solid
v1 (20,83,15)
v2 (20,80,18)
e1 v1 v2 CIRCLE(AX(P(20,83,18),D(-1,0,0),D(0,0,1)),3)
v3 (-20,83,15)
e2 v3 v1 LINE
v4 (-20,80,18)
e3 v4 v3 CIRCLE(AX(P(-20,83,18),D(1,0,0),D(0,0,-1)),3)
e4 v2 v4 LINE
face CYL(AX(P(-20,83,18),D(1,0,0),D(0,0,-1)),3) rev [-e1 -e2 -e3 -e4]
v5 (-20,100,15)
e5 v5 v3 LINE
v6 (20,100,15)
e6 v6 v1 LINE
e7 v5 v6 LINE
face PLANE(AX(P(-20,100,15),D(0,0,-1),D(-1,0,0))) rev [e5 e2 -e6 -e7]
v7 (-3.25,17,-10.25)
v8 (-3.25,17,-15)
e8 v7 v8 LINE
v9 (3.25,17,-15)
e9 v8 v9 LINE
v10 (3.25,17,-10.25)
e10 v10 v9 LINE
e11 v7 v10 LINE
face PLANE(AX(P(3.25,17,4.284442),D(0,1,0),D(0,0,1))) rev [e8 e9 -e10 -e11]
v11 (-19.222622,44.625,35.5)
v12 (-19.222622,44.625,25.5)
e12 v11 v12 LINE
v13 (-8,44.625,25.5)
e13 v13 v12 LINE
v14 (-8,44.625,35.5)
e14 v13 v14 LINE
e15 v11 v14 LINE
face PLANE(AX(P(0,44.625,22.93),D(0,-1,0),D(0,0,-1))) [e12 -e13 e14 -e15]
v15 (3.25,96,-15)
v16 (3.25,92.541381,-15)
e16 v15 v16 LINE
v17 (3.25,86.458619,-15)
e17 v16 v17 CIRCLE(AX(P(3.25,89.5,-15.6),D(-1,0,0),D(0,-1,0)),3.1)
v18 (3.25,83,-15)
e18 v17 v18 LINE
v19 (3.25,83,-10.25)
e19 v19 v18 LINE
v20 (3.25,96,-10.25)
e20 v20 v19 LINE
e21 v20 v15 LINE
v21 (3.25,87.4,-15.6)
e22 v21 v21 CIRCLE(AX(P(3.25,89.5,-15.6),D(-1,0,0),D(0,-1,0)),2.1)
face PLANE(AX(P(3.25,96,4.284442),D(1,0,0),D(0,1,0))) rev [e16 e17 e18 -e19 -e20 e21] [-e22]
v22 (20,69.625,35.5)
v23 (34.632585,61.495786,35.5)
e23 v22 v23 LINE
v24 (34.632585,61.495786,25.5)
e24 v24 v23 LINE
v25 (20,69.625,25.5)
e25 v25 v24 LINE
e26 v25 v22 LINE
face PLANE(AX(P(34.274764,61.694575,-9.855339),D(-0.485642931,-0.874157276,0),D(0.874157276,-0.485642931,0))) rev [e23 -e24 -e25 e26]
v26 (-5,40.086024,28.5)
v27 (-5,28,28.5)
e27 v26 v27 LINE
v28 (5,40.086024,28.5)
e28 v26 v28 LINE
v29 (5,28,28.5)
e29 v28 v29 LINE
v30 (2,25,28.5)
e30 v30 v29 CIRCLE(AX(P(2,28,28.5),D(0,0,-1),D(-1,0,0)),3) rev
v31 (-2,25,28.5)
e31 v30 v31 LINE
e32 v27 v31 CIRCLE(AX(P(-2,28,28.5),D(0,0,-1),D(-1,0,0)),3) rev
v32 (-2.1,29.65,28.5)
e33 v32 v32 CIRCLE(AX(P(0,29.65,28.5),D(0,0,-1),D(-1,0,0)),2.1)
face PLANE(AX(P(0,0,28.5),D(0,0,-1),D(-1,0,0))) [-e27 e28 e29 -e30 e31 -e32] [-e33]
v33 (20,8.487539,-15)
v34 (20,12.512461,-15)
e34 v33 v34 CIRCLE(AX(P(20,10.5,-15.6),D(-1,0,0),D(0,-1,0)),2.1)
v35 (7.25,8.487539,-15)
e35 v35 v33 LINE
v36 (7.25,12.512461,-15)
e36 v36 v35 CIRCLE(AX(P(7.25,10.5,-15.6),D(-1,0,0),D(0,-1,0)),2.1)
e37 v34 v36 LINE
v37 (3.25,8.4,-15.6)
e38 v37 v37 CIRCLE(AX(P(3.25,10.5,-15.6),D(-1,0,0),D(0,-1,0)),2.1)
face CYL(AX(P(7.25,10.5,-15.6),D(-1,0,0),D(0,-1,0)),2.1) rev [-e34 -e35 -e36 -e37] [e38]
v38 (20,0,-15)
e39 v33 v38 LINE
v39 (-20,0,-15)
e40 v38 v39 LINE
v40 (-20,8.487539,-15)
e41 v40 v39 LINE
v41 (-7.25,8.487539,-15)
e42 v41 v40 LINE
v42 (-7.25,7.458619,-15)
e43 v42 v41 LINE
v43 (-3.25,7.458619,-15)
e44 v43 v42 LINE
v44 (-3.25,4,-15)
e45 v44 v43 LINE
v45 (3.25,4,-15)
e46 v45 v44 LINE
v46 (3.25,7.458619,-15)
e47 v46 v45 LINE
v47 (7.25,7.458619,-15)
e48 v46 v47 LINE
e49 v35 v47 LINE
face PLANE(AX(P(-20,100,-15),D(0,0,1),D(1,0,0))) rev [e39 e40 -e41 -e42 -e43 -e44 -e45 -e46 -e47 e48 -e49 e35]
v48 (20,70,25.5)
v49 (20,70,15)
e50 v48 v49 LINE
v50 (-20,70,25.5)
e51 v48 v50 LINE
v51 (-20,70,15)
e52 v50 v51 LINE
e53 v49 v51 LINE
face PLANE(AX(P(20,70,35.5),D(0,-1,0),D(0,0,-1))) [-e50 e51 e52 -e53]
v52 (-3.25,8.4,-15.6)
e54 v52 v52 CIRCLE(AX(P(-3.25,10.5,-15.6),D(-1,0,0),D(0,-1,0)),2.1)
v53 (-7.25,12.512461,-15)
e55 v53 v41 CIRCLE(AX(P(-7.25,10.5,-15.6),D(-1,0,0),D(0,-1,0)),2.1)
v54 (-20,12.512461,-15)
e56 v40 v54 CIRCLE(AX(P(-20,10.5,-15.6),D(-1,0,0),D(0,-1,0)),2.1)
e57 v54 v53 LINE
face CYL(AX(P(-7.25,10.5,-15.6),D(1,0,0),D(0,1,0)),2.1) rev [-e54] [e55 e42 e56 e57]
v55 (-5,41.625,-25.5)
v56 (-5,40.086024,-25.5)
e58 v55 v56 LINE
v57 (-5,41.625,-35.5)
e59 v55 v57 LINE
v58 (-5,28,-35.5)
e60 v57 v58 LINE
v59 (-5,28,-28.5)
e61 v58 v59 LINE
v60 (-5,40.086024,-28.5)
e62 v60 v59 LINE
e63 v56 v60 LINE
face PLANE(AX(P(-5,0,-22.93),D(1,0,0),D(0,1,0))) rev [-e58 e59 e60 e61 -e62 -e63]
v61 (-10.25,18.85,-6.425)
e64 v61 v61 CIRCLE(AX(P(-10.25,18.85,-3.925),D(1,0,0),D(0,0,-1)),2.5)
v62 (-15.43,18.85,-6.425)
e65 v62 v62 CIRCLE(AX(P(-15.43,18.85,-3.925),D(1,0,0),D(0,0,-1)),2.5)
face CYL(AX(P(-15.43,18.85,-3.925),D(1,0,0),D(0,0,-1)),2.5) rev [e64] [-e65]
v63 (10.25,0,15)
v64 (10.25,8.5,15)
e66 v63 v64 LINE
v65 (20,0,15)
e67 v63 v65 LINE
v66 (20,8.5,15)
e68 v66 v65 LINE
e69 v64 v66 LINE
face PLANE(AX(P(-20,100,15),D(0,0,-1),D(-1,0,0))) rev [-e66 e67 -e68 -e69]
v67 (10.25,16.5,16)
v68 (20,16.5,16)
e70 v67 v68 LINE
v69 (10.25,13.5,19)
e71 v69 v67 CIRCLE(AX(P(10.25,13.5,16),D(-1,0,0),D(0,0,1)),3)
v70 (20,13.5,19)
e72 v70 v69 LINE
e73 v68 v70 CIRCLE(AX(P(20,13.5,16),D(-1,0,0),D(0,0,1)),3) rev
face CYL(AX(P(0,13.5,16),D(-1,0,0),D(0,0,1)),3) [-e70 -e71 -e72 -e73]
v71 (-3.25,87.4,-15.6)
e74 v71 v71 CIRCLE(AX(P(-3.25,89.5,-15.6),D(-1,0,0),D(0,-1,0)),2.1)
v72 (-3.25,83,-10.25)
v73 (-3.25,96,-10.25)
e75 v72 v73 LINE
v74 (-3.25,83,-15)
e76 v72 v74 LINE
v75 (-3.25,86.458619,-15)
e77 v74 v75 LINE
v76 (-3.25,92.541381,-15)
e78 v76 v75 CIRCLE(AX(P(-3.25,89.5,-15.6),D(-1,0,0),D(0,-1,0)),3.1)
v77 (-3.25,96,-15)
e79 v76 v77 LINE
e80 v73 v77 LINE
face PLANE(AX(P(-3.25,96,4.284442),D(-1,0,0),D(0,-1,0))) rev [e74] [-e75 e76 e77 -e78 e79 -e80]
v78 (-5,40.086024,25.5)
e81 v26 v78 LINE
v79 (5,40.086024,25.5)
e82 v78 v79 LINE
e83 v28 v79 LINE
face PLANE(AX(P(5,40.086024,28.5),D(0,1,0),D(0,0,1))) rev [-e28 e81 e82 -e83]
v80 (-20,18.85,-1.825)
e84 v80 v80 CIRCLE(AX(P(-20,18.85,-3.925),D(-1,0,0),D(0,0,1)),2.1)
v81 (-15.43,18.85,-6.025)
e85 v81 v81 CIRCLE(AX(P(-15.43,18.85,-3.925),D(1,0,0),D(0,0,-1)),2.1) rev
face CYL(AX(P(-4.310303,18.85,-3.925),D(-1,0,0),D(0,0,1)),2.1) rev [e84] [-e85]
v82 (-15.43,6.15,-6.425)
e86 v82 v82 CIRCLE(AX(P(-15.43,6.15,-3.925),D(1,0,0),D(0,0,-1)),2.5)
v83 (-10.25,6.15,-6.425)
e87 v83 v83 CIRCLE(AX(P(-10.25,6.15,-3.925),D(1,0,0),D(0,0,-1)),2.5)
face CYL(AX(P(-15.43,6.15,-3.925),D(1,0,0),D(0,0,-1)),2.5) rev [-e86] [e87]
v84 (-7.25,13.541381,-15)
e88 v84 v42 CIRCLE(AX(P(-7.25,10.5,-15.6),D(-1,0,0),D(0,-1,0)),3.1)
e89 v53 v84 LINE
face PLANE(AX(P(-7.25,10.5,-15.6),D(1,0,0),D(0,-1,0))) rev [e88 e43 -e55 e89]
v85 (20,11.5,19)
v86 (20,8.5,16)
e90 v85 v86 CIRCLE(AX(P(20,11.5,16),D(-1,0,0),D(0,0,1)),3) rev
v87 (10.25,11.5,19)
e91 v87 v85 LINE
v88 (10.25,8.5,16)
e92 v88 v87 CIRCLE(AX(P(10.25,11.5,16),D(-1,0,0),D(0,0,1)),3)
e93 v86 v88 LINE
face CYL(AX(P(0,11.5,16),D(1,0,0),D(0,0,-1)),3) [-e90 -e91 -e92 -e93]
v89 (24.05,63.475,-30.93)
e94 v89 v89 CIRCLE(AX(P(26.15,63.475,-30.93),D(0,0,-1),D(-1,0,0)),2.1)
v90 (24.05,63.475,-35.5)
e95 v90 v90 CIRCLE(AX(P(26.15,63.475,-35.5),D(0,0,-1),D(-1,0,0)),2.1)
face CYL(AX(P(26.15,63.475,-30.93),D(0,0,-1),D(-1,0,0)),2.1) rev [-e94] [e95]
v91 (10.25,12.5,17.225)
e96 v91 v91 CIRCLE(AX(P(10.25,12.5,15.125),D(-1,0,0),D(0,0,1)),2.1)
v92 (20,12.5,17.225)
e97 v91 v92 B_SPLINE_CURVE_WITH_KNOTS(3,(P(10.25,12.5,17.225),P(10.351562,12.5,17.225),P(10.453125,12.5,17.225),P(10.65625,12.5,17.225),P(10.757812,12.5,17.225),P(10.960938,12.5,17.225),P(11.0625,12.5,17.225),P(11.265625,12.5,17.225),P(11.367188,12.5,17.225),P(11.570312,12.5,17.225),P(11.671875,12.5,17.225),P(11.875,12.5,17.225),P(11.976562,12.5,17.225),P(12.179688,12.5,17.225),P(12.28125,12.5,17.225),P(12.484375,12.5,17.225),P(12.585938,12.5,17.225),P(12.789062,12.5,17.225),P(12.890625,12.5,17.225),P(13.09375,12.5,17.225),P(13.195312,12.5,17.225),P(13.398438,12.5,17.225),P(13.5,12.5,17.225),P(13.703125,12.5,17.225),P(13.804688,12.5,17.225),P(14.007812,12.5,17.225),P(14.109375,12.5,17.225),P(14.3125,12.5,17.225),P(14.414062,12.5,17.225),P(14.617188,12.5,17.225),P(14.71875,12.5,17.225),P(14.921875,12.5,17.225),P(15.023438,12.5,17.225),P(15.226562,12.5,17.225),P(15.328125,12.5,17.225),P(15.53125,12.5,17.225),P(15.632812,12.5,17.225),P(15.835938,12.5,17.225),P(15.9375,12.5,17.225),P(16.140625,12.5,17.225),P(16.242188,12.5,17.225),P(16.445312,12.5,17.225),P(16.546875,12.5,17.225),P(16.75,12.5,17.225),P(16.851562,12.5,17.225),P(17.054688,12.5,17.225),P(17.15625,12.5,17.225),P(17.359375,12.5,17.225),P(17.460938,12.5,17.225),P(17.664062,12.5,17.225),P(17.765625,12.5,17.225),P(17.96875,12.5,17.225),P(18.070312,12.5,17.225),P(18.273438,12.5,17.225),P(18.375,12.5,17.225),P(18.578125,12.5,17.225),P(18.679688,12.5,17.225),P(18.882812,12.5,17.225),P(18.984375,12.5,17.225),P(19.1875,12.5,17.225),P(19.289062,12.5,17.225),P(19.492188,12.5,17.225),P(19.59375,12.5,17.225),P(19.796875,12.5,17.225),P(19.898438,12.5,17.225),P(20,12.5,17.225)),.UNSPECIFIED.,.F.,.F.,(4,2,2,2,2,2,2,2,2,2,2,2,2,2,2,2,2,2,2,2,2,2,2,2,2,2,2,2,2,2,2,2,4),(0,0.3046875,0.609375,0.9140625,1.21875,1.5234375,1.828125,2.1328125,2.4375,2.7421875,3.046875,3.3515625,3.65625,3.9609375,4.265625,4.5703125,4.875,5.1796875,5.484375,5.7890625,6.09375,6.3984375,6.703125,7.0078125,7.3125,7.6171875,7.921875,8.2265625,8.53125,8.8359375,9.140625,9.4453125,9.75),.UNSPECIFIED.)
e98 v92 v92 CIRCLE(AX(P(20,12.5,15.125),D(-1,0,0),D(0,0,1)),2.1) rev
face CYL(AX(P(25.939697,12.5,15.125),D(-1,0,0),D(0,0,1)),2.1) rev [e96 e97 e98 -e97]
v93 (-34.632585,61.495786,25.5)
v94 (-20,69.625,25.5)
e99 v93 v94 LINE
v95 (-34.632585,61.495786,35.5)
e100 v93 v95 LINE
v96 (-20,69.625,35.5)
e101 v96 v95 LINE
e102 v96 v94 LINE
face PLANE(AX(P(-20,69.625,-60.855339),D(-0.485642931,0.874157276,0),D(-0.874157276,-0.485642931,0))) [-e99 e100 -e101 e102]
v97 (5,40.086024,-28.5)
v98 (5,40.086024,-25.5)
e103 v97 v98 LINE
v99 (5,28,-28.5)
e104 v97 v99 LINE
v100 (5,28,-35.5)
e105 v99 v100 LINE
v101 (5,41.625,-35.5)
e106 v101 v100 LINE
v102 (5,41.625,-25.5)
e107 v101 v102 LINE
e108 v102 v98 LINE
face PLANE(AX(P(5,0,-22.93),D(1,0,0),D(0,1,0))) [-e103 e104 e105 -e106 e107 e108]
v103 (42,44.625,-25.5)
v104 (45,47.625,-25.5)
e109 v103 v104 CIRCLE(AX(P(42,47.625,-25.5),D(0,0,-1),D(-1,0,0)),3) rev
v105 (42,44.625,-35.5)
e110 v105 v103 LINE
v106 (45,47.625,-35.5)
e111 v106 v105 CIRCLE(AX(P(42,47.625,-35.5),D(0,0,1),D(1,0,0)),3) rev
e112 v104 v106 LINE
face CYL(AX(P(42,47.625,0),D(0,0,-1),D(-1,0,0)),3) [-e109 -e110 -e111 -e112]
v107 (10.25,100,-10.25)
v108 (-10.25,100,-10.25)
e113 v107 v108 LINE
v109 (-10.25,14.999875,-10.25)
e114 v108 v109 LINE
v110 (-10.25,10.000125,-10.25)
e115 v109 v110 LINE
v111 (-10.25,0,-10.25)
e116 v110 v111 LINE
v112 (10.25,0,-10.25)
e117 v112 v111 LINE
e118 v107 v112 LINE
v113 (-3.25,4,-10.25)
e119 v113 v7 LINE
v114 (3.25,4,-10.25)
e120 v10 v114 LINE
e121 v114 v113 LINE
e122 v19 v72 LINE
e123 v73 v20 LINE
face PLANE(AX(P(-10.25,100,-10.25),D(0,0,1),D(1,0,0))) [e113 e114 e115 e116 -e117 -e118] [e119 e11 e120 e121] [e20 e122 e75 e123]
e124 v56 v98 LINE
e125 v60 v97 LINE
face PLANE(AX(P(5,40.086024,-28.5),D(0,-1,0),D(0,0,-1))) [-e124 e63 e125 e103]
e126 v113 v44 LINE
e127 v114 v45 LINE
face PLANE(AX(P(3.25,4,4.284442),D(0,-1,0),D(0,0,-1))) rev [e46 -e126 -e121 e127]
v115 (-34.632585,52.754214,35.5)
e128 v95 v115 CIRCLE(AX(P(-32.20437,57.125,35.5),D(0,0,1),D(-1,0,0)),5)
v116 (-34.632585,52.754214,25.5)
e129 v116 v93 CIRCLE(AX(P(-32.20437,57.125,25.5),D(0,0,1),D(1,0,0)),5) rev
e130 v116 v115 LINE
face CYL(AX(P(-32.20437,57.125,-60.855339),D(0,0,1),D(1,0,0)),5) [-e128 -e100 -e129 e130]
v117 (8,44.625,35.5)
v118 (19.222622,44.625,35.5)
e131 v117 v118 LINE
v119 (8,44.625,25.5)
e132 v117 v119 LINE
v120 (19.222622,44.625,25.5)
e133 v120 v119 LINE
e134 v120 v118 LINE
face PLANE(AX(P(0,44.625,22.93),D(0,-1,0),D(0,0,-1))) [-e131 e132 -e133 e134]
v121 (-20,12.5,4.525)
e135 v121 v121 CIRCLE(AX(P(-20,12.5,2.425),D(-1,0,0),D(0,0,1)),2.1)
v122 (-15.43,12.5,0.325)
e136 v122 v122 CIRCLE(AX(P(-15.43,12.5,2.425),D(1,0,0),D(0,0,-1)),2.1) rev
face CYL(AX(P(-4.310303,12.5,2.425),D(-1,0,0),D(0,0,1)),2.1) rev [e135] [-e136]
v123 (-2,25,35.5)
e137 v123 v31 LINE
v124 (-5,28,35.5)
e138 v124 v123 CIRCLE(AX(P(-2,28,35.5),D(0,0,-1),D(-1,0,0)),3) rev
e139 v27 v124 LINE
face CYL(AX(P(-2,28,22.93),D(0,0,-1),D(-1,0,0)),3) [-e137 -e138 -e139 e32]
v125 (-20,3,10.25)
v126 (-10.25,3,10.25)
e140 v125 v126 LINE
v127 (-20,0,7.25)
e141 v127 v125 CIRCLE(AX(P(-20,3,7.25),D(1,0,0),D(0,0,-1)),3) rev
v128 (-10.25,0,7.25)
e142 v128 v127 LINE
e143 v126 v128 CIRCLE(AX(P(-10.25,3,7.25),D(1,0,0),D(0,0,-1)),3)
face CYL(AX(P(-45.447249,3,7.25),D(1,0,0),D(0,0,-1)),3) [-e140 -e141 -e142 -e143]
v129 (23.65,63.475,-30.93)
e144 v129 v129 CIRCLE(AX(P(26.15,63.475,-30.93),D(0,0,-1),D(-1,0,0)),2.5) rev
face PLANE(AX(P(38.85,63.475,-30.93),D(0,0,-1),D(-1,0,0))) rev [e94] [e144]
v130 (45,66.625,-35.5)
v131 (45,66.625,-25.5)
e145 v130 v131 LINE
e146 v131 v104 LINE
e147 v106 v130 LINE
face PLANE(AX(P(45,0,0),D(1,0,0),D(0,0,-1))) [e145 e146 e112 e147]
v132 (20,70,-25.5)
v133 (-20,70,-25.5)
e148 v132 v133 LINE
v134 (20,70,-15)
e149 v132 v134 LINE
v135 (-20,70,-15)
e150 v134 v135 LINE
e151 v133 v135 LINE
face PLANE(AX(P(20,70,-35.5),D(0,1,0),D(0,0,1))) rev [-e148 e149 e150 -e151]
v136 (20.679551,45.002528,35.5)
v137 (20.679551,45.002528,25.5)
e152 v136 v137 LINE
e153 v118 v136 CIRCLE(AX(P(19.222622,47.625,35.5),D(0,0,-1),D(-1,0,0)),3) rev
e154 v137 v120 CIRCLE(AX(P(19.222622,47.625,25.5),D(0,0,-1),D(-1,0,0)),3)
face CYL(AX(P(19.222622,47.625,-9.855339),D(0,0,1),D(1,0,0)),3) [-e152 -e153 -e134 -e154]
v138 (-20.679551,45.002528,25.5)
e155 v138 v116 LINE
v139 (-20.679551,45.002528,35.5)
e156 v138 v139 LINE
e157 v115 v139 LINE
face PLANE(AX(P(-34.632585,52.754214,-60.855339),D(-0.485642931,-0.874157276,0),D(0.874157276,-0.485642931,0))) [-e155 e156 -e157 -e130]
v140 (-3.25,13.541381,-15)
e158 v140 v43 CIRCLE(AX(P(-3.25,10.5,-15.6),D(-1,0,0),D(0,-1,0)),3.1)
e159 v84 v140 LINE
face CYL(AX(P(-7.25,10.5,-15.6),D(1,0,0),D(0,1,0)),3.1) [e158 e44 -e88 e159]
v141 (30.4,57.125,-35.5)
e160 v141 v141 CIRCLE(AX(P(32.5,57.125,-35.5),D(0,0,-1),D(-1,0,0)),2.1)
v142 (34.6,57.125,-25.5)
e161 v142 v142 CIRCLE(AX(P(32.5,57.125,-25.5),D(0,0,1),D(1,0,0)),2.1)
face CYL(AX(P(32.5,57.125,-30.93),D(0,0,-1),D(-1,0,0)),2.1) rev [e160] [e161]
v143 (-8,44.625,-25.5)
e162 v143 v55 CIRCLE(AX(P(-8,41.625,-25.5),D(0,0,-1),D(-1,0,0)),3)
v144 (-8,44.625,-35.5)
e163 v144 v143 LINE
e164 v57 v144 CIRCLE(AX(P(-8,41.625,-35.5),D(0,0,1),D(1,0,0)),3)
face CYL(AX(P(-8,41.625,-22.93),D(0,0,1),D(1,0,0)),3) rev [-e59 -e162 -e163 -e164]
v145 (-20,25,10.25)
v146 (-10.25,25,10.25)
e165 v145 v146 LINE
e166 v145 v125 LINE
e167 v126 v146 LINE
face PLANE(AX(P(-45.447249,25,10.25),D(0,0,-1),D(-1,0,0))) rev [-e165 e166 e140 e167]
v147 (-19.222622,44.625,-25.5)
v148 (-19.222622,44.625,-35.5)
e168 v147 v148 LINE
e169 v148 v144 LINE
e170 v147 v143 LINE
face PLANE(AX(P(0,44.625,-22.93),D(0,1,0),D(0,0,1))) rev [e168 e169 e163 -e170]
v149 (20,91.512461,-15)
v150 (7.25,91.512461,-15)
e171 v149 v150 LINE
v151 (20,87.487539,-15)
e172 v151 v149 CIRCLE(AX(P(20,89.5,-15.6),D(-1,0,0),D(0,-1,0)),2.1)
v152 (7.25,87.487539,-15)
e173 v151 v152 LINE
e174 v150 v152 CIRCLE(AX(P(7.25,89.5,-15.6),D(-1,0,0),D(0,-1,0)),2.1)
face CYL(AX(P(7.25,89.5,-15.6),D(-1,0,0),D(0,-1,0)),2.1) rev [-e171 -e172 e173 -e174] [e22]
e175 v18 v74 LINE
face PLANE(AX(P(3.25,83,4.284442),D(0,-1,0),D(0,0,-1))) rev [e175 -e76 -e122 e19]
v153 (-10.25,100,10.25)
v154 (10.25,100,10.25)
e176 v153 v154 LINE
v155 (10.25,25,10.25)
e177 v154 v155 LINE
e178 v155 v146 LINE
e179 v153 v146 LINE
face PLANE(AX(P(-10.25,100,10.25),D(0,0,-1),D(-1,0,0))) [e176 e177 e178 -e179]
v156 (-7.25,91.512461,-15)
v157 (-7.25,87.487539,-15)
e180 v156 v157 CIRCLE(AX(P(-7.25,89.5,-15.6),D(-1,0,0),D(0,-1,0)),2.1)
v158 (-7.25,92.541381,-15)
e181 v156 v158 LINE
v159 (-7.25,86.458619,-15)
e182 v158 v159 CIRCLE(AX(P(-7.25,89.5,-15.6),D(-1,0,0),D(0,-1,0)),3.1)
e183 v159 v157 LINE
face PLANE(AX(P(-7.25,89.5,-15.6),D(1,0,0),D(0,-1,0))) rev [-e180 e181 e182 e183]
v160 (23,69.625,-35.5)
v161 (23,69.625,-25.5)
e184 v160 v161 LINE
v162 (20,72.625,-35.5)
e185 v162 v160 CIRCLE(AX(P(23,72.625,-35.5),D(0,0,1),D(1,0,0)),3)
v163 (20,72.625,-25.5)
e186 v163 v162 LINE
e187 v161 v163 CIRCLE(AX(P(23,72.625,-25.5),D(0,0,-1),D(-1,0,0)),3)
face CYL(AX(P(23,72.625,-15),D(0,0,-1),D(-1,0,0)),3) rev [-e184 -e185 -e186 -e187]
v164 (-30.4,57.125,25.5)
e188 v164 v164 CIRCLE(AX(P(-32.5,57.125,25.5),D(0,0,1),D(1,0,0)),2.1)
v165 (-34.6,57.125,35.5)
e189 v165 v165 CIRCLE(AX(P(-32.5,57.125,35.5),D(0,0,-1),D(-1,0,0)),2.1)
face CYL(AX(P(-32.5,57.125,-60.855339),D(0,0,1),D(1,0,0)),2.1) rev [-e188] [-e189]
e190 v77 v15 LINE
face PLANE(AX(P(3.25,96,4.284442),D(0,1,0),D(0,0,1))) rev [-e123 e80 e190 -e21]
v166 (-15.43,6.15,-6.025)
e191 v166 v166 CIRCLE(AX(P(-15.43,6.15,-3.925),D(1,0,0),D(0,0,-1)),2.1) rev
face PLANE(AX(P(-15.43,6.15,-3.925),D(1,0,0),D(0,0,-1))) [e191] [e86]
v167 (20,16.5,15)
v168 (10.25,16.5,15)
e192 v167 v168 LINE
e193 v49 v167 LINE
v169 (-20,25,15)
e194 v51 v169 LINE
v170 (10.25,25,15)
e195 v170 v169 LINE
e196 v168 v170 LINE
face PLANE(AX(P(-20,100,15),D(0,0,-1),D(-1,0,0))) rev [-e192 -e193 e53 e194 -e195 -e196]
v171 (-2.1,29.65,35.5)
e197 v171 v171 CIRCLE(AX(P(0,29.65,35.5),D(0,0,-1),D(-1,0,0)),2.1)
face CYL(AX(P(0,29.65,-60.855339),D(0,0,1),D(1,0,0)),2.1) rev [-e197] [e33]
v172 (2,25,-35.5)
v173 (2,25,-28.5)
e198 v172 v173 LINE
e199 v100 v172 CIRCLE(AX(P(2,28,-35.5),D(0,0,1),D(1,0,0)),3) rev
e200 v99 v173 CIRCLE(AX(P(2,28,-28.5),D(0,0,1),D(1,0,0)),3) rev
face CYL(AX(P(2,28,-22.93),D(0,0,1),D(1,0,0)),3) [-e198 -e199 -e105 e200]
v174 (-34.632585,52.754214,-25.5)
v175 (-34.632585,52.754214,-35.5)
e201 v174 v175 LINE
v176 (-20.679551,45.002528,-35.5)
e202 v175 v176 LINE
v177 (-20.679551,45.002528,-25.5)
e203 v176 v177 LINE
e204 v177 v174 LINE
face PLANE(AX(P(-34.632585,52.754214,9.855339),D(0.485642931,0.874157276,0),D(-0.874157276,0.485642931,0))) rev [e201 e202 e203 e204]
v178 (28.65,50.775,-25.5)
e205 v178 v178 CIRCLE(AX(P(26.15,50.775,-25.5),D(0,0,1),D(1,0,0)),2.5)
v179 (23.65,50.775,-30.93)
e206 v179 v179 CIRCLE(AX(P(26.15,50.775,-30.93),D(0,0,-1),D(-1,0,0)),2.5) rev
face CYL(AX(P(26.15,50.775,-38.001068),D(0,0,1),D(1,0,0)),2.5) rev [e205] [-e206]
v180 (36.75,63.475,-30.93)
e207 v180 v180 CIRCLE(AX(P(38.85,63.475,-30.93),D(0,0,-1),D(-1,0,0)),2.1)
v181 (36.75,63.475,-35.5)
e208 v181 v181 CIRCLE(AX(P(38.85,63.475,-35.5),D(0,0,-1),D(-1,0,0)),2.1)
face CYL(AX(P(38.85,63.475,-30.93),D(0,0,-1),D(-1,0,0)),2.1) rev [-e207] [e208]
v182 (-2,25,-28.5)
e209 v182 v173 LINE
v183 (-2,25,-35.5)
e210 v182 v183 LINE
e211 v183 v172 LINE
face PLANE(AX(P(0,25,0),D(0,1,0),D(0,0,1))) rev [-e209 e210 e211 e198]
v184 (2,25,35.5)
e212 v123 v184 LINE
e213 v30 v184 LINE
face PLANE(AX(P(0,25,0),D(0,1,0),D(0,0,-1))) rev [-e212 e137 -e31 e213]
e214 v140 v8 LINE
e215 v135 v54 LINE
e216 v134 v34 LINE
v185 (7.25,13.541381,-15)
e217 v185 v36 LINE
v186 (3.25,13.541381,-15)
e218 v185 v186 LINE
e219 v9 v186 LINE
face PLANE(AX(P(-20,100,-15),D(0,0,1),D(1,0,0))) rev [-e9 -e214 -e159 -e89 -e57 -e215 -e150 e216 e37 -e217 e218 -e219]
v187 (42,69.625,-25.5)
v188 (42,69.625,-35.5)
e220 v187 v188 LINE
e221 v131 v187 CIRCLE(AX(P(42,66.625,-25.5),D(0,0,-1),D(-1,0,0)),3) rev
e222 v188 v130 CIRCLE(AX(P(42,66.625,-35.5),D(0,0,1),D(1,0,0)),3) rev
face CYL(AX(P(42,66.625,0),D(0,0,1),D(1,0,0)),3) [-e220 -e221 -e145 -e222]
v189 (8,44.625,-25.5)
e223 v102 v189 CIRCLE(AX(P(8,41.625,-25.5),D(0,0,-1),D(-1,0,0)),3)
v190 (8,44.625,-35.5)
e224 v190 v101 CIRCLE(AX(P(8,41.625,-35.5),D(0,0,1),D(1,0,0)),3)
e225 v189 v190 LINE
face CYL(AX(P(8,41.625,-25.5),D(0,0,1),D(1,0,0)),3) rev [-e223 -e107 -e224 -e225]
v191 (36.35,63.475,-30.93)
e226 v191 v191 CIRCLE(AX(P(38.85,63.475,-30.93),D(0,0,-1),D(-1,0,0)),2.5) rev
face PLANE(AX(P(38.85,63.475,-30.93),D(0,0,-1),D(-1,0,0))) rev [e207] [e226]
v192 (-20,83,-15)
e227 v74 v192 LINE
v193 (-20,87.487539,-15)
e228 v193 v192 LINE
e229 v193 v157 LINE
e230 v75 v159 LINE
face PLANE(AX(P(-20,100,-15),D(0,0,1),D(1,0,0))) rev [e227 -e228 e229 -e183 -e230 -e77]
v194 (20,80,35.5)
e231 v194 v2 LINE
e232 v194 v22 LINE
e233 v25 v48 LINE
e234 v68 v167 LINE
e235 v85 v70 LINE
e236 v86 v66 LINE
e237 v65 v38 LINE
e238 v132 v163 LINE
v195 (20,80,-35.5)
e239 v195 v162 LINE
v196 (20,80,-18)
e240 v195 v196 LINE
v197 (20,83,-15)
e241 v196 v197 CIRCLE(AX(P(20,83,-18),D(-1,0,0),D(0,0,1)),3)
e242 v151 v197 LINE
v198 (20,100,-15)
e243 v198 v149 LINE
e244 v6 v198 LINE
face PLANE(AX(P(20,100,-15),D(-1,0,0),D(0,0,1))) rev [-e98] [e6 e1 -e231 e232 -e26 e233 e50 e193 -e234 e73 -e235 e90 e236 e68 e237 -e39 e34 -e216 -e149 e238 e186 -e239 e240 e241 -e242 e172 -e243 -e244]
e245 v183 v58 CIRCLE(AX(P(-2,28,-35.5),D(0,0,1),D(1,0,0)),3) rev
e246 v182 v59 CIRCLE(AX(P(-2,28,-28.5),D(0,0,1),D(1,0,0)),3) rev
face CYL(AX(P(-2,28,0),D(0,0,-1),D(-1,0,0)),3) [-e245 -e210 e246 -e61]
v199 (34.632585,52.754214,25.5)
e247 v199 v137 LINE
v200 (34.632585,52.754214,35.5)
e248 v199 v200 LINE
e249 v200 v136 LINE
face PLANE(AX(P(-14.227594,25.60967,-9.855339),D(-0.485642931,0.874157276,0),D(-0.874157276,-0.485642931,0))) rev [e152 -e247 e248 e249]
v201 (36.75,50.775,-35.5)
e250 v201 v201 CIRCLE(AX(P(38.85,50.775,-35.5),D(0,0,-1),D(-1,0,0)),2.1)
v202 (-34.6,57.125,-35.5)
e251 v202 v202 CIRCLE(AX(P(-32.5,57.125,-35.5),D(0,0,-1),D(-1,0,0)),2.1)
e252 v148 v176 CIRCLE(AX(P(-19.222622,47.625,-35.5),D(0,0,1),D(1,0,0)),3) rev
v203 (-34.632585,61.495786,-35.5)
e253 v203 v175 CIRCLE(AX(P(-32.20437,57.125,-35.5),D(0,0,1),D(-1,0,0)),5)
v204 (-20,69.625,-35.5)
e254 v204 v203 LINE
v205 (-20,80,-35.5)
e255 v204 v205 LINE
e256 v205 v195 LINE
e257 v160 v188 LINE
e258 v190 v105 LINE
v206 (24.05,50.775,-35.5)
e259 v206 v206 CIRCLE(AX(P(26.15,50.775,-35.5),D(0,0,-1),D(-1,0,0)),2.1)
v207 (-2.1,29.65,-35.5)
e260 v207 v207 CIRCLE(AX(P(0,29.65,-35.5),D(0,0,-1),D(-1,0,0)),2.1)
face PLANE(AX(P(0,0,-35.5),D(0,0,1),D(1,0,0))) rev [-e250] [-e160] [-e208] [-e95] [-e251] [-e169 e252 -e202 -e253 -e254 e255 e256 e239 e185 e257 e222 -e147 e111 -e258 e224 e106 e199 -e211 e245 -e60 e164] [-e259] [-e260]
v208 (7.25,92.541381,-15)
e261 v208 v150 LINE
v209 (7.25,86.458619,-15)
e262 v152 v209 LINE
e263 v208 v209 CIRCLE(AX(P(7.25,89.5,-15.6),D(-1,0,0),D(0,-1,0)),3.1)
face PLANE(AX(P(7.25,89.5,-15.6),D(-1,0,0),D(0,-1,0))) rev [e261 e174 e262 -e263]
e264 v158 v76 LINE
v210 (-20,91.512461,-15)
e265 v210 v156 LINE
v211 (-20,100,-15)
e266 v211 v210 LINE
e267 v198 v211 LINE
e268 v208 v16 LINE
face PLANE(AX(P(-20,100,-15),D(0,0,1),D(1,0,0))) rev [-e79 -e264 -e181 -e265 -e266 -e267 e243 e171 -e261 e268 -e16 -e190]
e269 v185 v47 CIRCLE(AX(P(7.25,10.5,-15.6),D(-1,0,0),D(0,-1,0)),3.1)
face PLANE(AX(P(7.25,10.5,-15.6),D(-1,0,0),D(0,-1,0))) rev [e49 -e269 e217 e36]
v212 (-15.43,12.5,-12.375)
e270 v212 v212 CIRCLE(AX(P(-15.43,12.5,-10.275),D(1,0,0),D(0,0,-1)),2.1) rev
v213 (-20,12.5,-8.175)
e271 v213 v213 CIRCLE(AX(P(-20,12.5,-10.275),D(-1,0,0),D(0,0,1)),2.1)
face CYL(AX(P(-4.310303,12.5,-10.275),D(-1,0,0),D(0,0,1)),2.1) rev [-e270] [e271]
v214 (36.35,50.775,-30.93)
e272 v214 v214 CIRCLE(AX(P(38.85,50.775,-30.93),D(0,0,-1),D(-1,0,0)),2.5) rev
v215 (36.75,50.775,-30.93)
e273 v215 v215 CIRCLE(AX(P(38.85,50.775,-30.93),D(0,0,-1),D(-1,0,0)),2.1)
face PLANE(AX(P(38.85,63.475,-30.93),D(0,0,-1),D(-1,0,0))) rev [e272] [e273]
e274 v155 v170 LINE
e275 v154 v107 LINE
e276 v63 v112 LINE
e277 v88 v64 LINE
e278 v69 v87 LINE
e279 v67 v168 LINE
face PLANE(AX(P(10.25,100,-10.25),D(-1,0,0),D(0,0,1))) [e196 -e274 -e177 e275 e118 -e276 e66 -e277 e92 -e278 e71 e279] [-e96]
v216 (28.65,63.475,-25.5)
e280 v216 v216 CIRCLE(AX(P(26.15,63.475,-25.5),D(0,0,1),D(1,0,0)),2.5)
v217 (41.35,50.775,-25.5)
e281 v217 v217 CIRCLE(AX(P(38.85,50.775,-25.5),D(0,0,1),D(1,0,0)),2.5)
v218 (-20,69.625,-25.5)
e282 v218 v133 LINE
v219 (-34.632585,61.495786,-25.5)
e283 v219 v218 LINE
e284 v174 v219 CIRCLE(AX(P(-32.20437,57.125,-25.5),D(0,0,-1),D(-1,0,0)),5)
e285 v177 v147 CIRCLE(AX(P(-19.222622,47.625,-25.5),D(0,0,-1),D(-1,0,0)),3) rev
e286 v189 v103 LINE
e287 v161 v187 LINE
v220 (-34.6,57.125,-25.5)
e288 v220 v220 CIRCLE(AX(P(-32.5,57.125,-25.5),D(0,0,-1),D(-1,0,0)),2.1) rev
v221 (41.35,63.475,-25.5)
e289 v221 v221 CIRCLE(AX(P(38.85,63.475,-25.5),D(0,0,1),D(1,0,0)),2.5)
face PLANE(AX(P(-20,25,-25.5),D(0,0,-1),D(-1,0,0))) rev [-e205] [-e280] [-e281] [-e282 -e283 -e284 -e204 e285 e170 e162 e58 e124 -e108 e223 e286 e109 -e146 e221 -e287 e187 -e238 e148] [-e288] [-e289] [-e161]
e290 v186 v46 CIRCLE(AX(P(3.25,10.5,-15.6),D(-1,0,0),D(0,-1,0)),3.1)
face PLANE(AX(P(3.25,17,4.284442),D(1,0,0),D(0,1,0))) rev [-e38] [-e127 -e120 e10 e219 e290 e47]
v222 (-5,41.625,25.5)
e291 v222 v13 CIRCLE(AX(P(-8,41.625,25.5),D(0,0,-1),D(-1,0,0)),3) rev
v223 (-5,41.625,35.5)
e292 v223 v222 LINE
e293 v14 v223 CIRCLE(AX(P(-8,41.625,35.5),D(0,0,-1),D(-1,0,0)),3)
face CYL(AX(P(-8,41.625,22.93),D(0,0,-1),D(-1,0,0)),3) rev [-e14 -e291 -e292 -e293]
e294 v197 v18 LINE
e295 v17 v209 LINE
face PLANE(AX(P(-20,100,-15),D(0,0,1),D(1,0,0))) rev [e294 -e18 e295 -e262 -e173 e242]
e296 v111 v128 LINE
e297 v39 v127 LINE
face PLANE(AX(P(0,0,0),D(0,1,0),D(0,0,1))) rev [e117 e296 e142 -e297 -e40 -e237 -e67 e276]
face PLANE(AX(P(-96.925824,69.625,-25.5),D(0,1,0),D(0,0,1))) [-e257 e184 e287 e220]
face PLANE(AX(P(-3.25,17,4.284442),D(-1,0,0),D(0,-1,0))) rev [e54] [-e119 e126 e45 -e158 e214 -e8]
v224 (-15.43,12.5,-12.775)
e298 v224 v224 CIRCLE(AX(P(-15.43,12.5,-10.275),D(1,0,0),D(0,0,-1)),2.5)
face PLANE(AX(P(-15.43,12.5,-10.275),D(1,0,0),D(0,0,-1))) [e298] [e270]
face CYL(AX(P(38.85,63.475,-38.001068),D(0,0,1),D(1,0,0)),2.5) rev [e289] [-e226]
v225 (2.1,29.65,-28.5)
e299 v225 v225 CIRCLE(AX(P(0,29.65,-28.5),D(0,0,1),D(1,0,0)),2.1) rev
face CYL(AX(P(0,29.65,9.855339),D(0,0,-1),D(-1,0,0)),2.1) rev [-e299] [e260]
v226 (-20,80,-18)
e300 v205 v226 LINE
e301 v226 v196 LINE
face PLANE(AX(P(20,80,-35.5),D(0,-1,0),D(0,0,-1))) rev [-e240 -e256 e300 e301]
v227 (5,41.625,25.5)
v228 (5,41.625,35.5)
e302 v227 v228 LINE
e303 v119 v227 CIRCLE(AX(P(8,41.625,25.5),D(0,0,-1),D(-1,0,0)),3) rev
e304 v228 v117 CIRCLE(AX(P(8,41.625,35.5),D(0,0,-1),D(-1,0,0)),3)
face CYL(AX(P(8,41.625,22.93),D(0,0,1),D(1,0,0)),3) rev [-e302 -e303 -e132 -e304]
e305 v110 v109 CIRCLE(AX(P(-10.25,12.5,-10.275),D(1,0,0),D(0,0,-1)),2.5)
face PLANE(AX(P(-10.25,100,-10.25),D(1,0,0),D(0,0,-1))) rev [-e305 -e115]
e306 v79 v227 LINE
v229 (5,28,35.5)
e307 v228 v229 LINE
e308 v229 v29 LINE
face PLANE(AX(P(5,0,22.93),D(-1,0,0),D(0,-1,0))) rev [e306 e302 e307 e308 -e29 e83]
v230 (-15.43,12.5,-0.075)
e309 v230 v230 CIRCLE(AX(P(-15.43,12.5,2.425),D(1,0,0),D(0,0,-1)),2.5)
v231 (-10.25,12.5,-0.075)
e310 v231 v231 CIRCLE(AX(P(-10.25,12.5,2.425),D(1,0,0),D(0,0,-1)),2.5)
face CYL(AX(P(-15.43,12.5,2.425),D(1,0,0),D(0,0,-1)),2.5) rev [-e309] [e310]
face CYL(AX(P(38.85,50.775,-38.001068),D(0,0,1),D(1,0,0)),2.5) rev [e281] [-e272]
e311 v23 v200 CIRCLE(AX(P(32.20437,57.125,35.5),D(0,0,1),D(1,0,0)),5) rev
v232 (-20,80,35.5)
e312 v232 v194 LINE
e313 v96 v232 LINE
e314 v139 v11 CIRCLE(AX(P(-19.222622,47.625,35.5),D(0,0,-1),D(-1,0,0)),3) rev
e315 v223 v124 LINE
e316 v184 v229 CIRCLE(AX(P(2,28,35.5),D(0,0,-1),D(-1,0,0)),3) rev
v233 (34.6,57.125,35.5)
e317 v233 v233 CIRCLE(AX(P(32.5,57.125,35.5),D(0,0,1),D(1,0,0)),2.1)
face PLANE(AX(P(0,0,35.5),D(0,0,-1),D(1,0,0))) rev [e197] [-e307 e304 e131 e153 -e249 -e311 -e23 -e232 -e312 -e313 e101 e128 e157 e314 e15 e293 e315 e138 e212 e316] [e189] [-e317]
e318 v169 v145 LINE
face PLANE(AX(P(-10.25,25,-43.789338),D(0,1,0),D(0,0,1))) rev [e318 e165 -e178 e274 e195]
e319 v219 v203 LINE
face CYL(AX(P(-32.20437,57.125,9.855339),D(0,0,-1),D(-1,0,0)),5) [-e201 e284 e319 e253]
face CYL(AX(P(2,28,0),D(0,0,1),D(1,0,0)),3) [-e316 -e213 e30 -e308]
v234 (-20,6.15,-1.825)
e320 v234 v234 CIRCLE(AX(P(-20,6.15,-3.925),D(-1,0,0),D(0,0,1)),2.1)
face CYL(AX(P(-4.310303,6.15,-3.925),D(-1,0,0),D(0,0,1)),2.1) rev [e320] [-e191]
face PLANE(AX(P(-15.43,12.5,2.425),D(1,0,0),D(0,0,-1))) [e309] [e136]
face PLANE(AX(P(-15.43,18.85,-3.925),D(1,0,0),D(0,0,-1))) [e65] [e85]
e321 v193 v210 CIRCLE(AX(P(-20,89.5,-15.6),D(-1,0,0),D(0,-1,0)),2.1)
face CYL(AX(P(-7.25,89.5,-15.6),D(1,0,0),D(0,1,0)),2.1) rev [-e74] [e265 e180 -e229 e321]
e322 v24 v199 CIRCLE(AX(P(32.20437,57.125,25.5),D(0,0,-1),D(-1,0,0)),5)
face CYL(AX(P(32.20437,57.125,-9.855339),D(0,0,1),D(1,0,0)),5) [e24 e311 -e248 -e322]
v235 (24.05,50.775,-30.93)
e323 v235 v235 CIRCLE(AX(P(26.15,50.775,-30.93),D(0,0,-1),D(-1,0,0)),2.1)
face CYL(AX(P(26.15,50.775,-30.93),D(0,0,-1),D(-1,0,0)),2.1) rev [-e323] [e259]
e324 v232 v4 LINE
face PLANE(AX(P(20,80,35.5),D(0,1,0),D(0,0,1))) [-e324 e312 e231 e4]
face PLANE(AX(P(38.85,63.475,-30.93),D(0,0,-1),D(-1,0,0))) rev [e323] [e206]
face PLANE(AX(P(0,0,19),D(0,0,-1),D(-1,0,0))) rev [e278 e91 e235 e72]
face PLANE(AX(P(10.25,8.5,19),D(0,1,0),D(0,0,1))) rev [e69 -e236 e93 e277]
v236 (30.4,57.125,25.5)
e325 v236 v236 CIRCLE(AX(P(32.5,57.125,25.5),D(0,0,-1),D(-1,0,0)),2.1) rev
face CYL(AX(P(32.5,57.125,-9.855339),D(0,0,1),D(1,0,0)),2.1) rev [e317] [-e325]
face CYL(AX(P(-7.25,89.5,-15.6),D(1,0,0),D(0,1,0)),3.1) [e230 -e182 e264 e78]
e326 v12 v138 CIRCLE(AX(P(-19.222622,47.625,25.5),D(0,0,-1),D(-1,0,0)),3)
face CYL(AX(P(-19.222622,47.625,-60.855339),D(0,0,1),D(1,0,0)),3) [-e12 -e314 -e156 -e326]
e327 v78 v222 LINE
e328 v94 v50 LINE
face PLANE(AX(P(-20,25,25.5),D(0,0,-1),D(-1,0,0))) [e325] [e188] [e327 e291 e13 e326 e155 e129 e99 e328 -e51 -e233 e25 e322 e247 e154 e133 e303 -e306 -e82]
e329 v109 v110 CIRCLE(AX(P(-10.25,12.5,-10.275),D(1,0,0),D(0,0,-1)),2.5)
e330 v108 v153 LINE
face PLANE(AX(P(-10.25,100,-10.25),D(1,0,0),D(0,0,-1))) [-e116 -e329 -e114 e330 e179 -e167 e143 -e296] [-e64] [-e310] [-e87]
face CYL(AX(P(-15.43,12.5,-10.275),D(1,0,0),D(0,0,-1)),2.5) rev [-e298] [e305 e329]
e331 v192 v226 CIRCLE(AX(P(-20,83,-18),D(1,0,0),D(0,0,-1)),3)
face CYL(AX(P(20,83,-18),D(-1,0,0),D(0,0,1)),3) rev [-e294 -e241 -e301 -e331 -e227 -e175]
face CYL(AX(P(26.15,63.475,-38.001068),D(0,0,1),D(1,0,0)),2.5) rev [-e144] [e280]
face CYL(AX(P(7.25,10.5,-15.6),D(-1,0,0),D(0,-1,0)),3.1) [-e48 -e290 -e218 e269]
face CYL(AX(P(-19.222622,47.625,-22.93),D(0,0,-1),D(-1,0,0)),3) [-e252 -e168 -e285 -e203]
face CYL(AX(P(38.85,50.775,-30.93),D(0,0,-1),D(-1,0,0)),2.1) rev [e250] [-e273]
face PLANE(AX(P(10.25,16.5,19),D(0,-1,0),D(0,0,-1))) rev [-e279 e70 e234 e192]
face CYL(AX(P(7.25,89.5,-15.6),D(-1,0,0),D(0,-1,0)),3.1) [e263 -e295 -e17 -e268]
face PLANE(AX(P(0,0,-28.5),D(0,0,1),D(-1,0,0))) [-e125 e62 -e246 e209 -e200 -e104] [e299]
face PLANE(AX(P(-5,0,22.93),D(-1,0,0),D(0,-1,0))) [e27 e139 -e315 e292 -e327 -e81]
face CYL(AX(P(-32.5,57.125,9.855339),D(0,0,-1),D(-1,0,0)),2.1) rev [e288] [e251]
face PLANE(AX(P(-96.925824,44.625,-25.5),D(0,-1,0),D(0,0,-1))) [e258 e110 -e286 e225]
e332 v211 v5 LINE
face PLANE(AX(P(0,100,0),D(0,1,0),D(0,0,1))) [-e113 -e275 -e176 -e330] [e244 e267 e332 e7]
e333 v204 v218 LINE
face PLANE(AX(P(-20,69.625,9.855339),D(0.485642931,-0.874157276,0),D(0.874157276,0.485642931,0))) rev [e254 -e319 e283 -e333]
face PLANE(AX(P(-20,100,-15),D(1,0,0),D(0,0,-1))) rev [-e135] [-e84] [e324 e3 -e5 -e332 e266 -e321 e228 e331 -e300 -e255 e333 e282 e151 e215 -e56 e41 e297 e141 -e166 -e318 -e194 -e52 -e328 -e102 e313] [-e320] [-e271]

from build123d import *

# Parameters (mm, degrees)
SKETCH2_W           = 40
SKETCH2_H           = 30
BOSS_EXTRUDE1_DEPTH = 100
SKETCH3_W           = 20.5
SKETCH3_H           = 20.5
CUT_EXTRUDE1_DEPTH  = 100
SKETCH4_W           = 20.5
SKETCH4_H           = 50
CUT_EXTRUDE2_DEPTH  = 4.75
SKETCH5_W           = 4.75
SKETCH5_H           = 25
CUT_EXTRUDE4_DEPTH  = 9.75
SKETCH6_R           = 2.1
CUT_EXTRUDE5_DEPTH  = 9.75
SKETCH7_R           = 2.5
CUT_EXTRUDE6_DEPTH  = 5.18
SKETCH8_W           = 40
SKETCH8_H           = 10
BOSS_EXTRUDE2_DEPTH = 20.5
SKETCH9_W           = 40
SKETCH9_H           = 10
BOSS_EXTRUDE3_DEPTH = 45
BOSS_EXTRUDE4_START = -65
SKETCH11_W          = 10
SKETCH11_H          = 25
BOSS_EXTRUDE4_DEPTH = 90
SKETCH13_R          = 2.1
CUT_EXTRUDE7_DEPTH  = 4.57
CUT_EXTRUDE8_START  = -5.43
SKETCH14_R          = 2.1
SKETCH14_R_2        = 2.5
CUT_EXTRUDE8_DEPTH  = 5.43
SKETCH15_R          = 2.1
CUT_EXTRUDE9_DEPTH  = 10
CUT_EXTRUDE10_REACH = 132.637
SKETCH18_R          = 2.1
SKETCH19_W          = 15
SKETCH19_H          = 19.625
CUT_EXTRUDE11_DEPTH = 12.57
FILLET1_R           = 3
SKETCH20_W          = 11.314866833
SKETCH20_H          = 26.234404623
CUT_EXTRUDE12_DEPTH = 3
SKETCH22_W          = 9.75
SKETCH22_H          = 8
BOSS_EXTRUDE5_DEPTH = 4
SKETCH21_R          = 2.1
CUT_EXTRUDE13_DEPTH = 40
FILLET2_R           = 3
SKETCH23_W          = 6.5
SKETCH23_H          = 13
CUT_EXTRUDE14_DEPTH = 4.75
SKETCH25_R          = 3.1
SKETCH25_R_2        = 2.1
BOSS_EXTRUDE7_DEPTH = 4
SKETCH25_3_R        = 2.1
CUT_EXTRUDE16_DEPTH = 16.75


with BuildPart() as part:
    # Sketch2 → Boss-Extrude1 (new body)
    with BuildSketch(Plane(origin=(0, 0, 0), x_dir=(1, 0, 0), z_dir=(0, 1, 0))):
        Rectangle(SKETCH2_W, SKETCH2_H)
    extrude(amount=BOSS_EXTRUDE1_DEPTH)

    # Sketch3 → Cut-Extrude1 (cut)
    with BuildSketch(Plane(origin=(0, 0, 0), x_dir=(1, 0, 0), z_dir=(0, 1, 0))):
        Rectangle(SKETCH3_W, SKETCH3_H)
    extrude(amount=CUT_EXTRUDE1_DEPTH, mode=Mode.SUBTRACT)

    # Sketch4 → Cut-Extrude2 (cut)
    with BuildSketch(Plane.XY.offset(15)):
        Rectangle(SKETCH4_W, SKETCH4_H)
    extrude(amount=-CUT_EXTRUDE2_DEPTH, mode=Mode.SUBTRACT)

    # Sketch5 → Cut-Extrude4 (cut)
    with BuildSketch(Plane(origin=(-10.25, 0, 0), x_dir=(0, 0, -1), z_dir=(1, 0, 0))):
        with Locations((-12.625, 12.5)):
            Rectangle(SKETCH5_W, SKETCH5_H)
    extrude(amount=-CUT_EXTRUDE4_DEPTH, mode=Mode.SUBTRACT)

    # Sketch6 → Cut-Extrude5 (cut)
    with BuildSketch(Plane.ZY.offset(20)):
        with Locations((2.425, 12.5)):
            Circle(SKETCH6_R)
        with Locations((-10.275, 12.5)):
            Circle(SKETCH6_R)
        with Locations((-3.925, 18.85)):
            Circle(SKETCH6_R)
        with Locations((-3.925, 6.15)):
            Circle(SKETCH6_R)
    extrude(amount=-CUT_EXTRUDE5_DEPTH, mode=Mode.SUBTRACT)

    # Sketch7 → Cut-Extrude6 (cut)
    with BuildSketch(Plane(origin=(-10.25, 0, 0), x_dir=(0, 0, -1), z_dir=(1, 0, 0))):
        with Locations((-2.425, 12.5)):
            Circle(SKETCH7_R)
        with Locations((10.275, 12.5)):
            Circle(SKETCH7_R)
        with Locations((3.925, 18.85)):
            Circle(SKETCH7_R)
        with Locations((3.925, 6.15)):
            Circle(SKETCH7_R)
    extrude(amount=-CUT_EXTRUDE6_DEPTH, mode=Mode.SUBTRACT)

    # Sketch8 → Boss-Extrude2 (add)
    with BuildSketch(Plane(origin=(0, 0, -15), x_dir=(-1, 0, 0), z_dir=(0, 0, -1))):
        with Locations((0, 75)):
            Rectangle(SKETCH8_W, SKETCH8_H)
    boss_extrude2 = extrude(amount=BOSS_EXTRUDE2_DEPTH)

    # Sketch9 → Boss-Extrude3 (add)
    with BuildSketch(Plane.XZ.offset(-70)):
        with Locations((0, -30.5)):
            Rectangle(SKETCH9_W, SKETCH9_H)
    boss_extrude3 = extrude(amount=BOSS_EXTRUDE3_DEPTH)

    # Sketch11 → Boss-Extrude4 (add)
    with BuildSketch(Plane(origin=(20, 0, 0), x_dir=(0, 0, -1), z_dir=(1, 0, 0)).offset(BOSS_EXTRUDE4_START)):
        with Locations((30.5, 57.125)):
            Rectangle(SKETCH11_W, SKETCH11_H)
    boss_extrude4 = extrude(amount=BOSS_EXTRUDE4_DEPTH)

    # Sketch13 → Cut-Extrude7 (cut)
    with BuildSketch(Plane(origin=(0, 0, -35.5), x_dir=(-1, 0, 0), z_dir=(0, 0, -1))):
        with Locations((-32.5, 57.125)):
            Circle(SKETCH13_R)
        with Locations((-26.15, 63.475)):
            Circle(SKETCH13_R)
        with Locations((-38.85, 63.475)):
            Circle(SKETCH13_R)
        with Locations((-38.85, 50.775)):
            Circle(SKETCH13_R)
        with Locations((-26.15, 50.775)):
            Circle(SKETCH13_R)
    extrude(amount=-CUT_EXTRUDE7_DEPTH, mode=Mode.SUBTRACT)

    # Sketch14 → Cut-Extrude8 (cut)
    with BuildSketch(Plane.XY.offset(-25.5).offset(CUT_EXTRUDE8_START)):
        with Locations(Location((32.5, 57.125, 0), (0, 0, 180))):
            Circle(SKETCH14_R)
        with Locations((38.85, 63.475)):
            Circle(SKETCH14_R_2)
        with Locations((26.15, 63.475)):
            Circle(SKETCH14_R_2)
        with Locations((26.15, 50.775)):
            Circle(SKETCH14_R_2)
        with Locations((38.85, 50.775)):
            Circle(SKETCH14_R_2)
    extrude(amount=CUT_EXTRUDE8_DEPTH, mode=Mode.SUBTRACT)

    # Sketch15 → Cut-Extrude9 (cut)
    with BuildSketch(Plane(origin=(0, 0, -35.5), x_dir=(-1, 0, 0), z_dir=(0, 0, -1))):
        with Locations((32.5, 57.125)):
            Circle(SKETCH15_R)
        with Locations((0, 29.65)):
            Circle(SKETCH15_R)
        with BuildLine():
            Line((20, 69.625), (34.632584515, 61.495786381))
            ThreePointArc((34.632584515, 61.495786381), (37.204369859, 57.125), (34.632584515, 52.754213619))
            Line((34.632584515, 52.754213619), (20, 44.625))
            Line((20, 44.625), (45, 44.625))
            Line((45, 44.625), (45, 69.625))
            Line((45, 69.625), (20, 69.625))
        make_face()
    cut_extrude9 = extrude(amount=-CUT_EXTRUDE9_DEPTH, mode=Mode.SUBTRACT)

    # Mirror2: Boss-Extrude2, Boss-Extrude3, Boss-Extrude4, Cut-Extrude9 across plane
    add(boss_extrude2.mirror(Plane.XY))
    add(boss_extrude3.mirror(Plane.XY))
    add(boss_extrude4.mirror(Plane.XY))
    add(cut_extrude9.mirror(Plane.XY), mode=Mode.SUBTRACT)

    # Sketch18 → Cut-Extrude10 (cut, up to next)
    with BuildSketch(Plane.XY.offset(35.5), mode=Mode.PRIVATE) as cut_extrude10_sk1:
        with BuildLine():
            Line((20, 69.625), (34.632584515, 61.495786381))
            ThreePointArc((34.632584515, 61.495786381), (37.204369859, 57.125), (34.632584515, 52.754213619))
            Line((34.632584515, 52.754213619), (20, 44.625))
            Line((20, 44.625), (45, 44.625))
            Line((45, 44.625), (45, 69.625))
            Line((45, 69.625), (20, 69.625))
        make_face()
    cut_extrude10_tool1 = extrude(cut_extrude10_sk1.sketch, amount=-CUT_EXTRUDE10_REACH, mode=Mode.PRIVATE) & part.part
    # Sketch18 → Cut-Extrude10 (cut, up to next)
    with BuildSketch(Plane.XY.offset(35.5), mode=Mode.PRIVATE) as cut_extrude10_sk2:
        with Locations(Location((32.5, 57.125, 0), (0, 0, 180))):
            Circle(SKETCH18_R)
    cut_extrude10_tool2 = extrude(cut_extrude10_sk2.sketch, amount=-CUT_EXTRUDE10_REACH, mode=Mode.PRIVATE) & part.part
    add(cut_extrude10_tool1.solids().sort_by_distance((27.487993, 65.869454, 35.5))[0], mode=Mode.SUBTRACT)
    add(cut_extrude10_tool2.solids().sort_by_distance((32.5, 57.125, 35.5))[0], mode=Mode.SUBTRACT)

    # Sketch19 → Cut-Extrude11 (cut)
    with BuildSketch(Plane.XY.offset(35.5)):
        with Locations((-12.5, 34.8125)):
            Rectangle(SKETCH19_W, SKETCH19_H)
        with Locations((12.5, 34.8125)):
            Rectangle(SKETCH19_W, SKETCH19_H)
    cut_extrude11 = extrude(amount=-CUT_EXTRUDE11_DEPTH, mode=Mode.SUBTRACT)

    # Mirror3: Cut-Extrude11 across plane
    add(cut_extrude11.mirror(Plane.XY), mode=Mode.SUBTRACT)

    # Fillet1
    # the kernel refuses this fillet: 3 mm, written as the material it adds along each edge
    with BuildSketch(Plane(origin=(-20, 80, -15), x_dir=(0, 1, 0), z_dir=(1, 0, 0)), Plane(origin=(-20, 80, 15), x_dir=(0, 0, 1), z_dir=(1, 0, 0))) as fillet1_piece_1:
        with BuildLine():
            CenterArc((FILLET1_R, -FILLET1_R), FILLET1_R, 90, 90)
            Line((0, -FILLET1_R), (0, 0))
            Line((0, 0), (FILLET1_R, 0))
        make_face()
    extrude(amount=40)
    with BuildSketch(Plane(origin=(20, 69.625, -35.5), x_dir=(1, 0, 0), z_dir=(0, 0, 1)), Plane(origin=(-5, 44.625, 35.5), x_dir=(0, -1, 0), z_dir=(0, 0, -1)), Plane(origin=(5, 44.625, 35.5), x_dir=(1, 0, 0), z_dir=(0, 0, -1)), Plane(origin=(-5, 44.625, -35.5), x_dir=(-1, 0, 0), z_dir=(0, 0, 1)), Plane(origin=(5, 44.625, -35.5), x_dir=(0, -1, 0), z_dir=(0, 0, 1))) as fillet1_piece_2:
        with BuildLine():
            CenterArc((FILLET1_R, FILLET1_R), FILLET1_R, 180, 90)
            Line((0, FILLET1_R), (0, 0))
            Line((0, 0), (FILLET1_R, 0))
        make_face()
    extrude(amount=10)
    # the kernel refuses this fillet: 3 mm, written as the material it takes off along each edge
    with BuildSketch(Plane(origin=(-20, 44.625, -37.443445211), x_dir=(1, 0, 0), z_dir=(0, 0, 1)), Plane(origin=(-20, 44.625, 37.443445211), x_dir=(-0.8741572761215363, 0.48564293117863483, 0), z_dir=(0, 0, -1))) as fillet1_2_piece_1:
        with BuildLine():
            CenterArc((FILLET1_R * 0.259126028197, FILLET1_R), FILLET1_R, 240.945395901, 29.054604099)
            Line((-FILLET1_R * 0.226516902981, FILLET1_R * 0.125842723878), (0, 0))
            Line((0, 0), (FILLET1_R * 0.259126028197, 0))
        make_face()
    extrude(amount=13.886890423, mode=Mode.SUBTRACT)
    with BuildSketch(Plane(origin=(45, 44.625, -43), x_dir=(0, 1, 0), z_dir=(0, 0, 1)), Plane(origin=(5, 25, 43), x_dir=(-1, 0, 0), z_dir=(0, 0, -1)), Plane(origin=(-5, 25, 43), x_dir=(0, 1, 0), z_dir=(0, 0, -1)), Plane(origin=(5, 25, -43), x_dir=(0, 1, 0), z_dir=(0, 0, 1)), Plane(origin=(-5, 25, -43), x_dir=(1, 0, 0), z_dir=(0, 0, 1))) as fillet1_2_piece_2:
        with BuildLine():
            CenterArc((FILLET1_R, FILLET1_R), FILLET1_R, 180, 90)
            Line((0, FILLET1_R), (0, 0))
            Line((0, 0), (FILLET1_R, 0))
        make_face()
    extrude(amount=25, mode=Mode.SUBTRACT)
    with BuildSketch(Plane(origin=(45, 69.625, -18), x_dir=(-1, 0, 0), z_dir=(0, 0, -1))) as fillet1_2_piece_3:
        with BuildLine():
            CenterArc((FILLET1_R, -FILLET1_R), FILLET1_R, 90, 90)
            Line((0, -FILLET1_R), (0, 0))
            Line((0, 0), (FILLET1_R, 0))
        make_face()
    extrude(amount=25, mode=Mode.SUBTRACT)
    with BuildSketch(Plane(origin=(20, 44.625, 23.556554789), x_dir=(-1, 0, 0), z_dir=(0, 0, 1))) as fillet1_2_piece_4:
        with BuildLine():
            CenterArc((FILLET1_R * 0.259126028197, -FILLET1_R), FILLET1_R, 90, 29.054604099)
            Line((-FILLET1_R * 0.226516902981, -FILLET1_R * 0.125842723878), (0, 0))
            Line((0, 0), (FILLET1_R * 0.259126028197, 0))
        make_face()
    extrude(amount=13.886890423, mode=Mode.SUBTRACT)
    with BuildSketch(Plane(origin=(-2.75, 0, 10.25), x_dir=(0, 0, -1), z_dir=(-1, 0, 0))) as fillet1_2_piece_5:
        with BuildLine():
            CenterArc((FILLET1_R, -FILLET1_R), FILLET1_R, 90, 90)
            Line((0, -FILLET1_R), (0, 0))
            Line((0, 0), (FILLET1_R, 0))
        make_face()
    extrude(amount=24.75, mode=Mode.SUBTRACT)

    # Sketch20 → Cut-Extrude12 (cut)
    with BuildSketch(Plane(origin=(0, 0, 25.5), x_dir=(-1, 0, 0), z_dir=(0, 0, -1))):
        with Locations((0.657433416, 26.968821653)):
            Rectangle(SKETCH20_W, SKETCH20_H)
    cut_extrude12 = extrude(amount=-CUT_EXTRUDE12_DEPTH, mode=Mode.SUBTRACT)

    # Mirror4: Cut-Extrude12 across plane
    add(cut_extrude12.mirror(Plane.XY), mode=Mode.SUBTRACT)

    # Sketch22 → Boss-Extrude5 (add)
    with BuildSketch(Plane.XY.offset(15)):
        with Locations((15.125, 12.5)):
            Rectangle(SKETCH22_W, SKETCH22_H)
    extrude(amount=BOSS_EXTRUDE5_DEPTH)

    # Sketch21 → Cut-Extrude13 (cut)
    with BuildSketch(Plane.ZY.offset(20)):
        with Locations((15.125, 12.5)):
            Circle(SKETCH21_R)
    extrude(amount=-CUT_EXTRUDE13_DEPTH, mode=Mode.SUBTRACT)

    # Fillet2
    fillet2_edges = [part.edges().sort_by_distance(p)[0] for p in [
        (15.125, 8.5, 19),
        (15.125, 16.5, 19),
    ]]
    fillet(fillet2_edges, radius=FILLET2_R)

    # Sketch23 → Cut-Extrude14 (cut)
    with BuildSketch(Plane(origin=(0, 0, -15), x_dir=(-1, 0, 0), z_dir=(0, 0, -1))):
        with Locations((0, 89.5)):
            Rectangle(SKETCH23_W, SKETCH23_H)
        with Locations((0, 10.5)):
            Rectangle(SKETCH23_W, SKETCH23_H)
    extrude(amount=-CUT_EXTRUDE14_DEPTH, mode=Mode.SUBTRACT)

    # Sketch25 → Boss-Extrude7 (add)
    # profile 1 of 2: a face of its own
    with BuildSketch(Plane.ZY.offset(-3.25)):
        with Locations((-15.6, 89.5)):
            Circle(SKETCH25_R)
        with Locations((-15.6, 89.5)):
            Circle(SKETCH25_R_2, mode=Mode.SUBTRACT)
    # profile 2 of 2: a face of its own
    with BuildSketch(Plane.ZY.offset(-3.25)):
        with Locations((-15.6, 10.5)):
            Circle(SKETCH25_R)
        with Locations((-15.6, 10.5)):
            Circle(SKETCH25_R_2, mode=Mode.SUBTRACT)
    boss_extrude7 = extrude(amount=-BOSS_EXTRUDE7_DEPTH)

    # Sketch25<3> → Cut-Extrude16 (cut)
    with BuildSketch(Plane.ZY.offset(-3.25)):
        with Locations(Location((-15.6, 10.5, 0), (0, 0, 270))):
            Circle(SKETCH25_3_R)
        with BuildLine():
            ThreePointArc((-15, 87.48753882), (-13.916254176, 88.24500996), (-13.5, 89.5))
            ThreePointArc((-13.5, 89.5), (-13.916254176, 90.75499004), (-15, 91.51246118))
            Line((-15, 91.51246118), (-15, 87.48753882))
        make_face()
        with BuildLine():
            Line((-15, 87.48753882), (-15, 91.51246118))
            ThreePointArc((-15, 91.51246118), (-17.7, 89.5), (-15, 87.48753882))
        make_face()
    cut_extrude16 = extrude(amount=-CUT_EXTRUDE16_DEPTH, mode=Mode.SUBTRACT)

    # Mirror5: Boss-Extrude7, Cut-Extrude16 across plane
    add(boss_extrude7.mirror(Plane(origin=(0, 0, 0), x_dir=(0, 0, 1), z_dir=(1, 0, 0))))
    add(cut_extrude16.mirror(Plane(origin=(0, 0, 0), x_dir=(0, 0, 1), z_dir=(1, 0, 0))), mode=Mode.SUBTRACT)


solid = part.part
